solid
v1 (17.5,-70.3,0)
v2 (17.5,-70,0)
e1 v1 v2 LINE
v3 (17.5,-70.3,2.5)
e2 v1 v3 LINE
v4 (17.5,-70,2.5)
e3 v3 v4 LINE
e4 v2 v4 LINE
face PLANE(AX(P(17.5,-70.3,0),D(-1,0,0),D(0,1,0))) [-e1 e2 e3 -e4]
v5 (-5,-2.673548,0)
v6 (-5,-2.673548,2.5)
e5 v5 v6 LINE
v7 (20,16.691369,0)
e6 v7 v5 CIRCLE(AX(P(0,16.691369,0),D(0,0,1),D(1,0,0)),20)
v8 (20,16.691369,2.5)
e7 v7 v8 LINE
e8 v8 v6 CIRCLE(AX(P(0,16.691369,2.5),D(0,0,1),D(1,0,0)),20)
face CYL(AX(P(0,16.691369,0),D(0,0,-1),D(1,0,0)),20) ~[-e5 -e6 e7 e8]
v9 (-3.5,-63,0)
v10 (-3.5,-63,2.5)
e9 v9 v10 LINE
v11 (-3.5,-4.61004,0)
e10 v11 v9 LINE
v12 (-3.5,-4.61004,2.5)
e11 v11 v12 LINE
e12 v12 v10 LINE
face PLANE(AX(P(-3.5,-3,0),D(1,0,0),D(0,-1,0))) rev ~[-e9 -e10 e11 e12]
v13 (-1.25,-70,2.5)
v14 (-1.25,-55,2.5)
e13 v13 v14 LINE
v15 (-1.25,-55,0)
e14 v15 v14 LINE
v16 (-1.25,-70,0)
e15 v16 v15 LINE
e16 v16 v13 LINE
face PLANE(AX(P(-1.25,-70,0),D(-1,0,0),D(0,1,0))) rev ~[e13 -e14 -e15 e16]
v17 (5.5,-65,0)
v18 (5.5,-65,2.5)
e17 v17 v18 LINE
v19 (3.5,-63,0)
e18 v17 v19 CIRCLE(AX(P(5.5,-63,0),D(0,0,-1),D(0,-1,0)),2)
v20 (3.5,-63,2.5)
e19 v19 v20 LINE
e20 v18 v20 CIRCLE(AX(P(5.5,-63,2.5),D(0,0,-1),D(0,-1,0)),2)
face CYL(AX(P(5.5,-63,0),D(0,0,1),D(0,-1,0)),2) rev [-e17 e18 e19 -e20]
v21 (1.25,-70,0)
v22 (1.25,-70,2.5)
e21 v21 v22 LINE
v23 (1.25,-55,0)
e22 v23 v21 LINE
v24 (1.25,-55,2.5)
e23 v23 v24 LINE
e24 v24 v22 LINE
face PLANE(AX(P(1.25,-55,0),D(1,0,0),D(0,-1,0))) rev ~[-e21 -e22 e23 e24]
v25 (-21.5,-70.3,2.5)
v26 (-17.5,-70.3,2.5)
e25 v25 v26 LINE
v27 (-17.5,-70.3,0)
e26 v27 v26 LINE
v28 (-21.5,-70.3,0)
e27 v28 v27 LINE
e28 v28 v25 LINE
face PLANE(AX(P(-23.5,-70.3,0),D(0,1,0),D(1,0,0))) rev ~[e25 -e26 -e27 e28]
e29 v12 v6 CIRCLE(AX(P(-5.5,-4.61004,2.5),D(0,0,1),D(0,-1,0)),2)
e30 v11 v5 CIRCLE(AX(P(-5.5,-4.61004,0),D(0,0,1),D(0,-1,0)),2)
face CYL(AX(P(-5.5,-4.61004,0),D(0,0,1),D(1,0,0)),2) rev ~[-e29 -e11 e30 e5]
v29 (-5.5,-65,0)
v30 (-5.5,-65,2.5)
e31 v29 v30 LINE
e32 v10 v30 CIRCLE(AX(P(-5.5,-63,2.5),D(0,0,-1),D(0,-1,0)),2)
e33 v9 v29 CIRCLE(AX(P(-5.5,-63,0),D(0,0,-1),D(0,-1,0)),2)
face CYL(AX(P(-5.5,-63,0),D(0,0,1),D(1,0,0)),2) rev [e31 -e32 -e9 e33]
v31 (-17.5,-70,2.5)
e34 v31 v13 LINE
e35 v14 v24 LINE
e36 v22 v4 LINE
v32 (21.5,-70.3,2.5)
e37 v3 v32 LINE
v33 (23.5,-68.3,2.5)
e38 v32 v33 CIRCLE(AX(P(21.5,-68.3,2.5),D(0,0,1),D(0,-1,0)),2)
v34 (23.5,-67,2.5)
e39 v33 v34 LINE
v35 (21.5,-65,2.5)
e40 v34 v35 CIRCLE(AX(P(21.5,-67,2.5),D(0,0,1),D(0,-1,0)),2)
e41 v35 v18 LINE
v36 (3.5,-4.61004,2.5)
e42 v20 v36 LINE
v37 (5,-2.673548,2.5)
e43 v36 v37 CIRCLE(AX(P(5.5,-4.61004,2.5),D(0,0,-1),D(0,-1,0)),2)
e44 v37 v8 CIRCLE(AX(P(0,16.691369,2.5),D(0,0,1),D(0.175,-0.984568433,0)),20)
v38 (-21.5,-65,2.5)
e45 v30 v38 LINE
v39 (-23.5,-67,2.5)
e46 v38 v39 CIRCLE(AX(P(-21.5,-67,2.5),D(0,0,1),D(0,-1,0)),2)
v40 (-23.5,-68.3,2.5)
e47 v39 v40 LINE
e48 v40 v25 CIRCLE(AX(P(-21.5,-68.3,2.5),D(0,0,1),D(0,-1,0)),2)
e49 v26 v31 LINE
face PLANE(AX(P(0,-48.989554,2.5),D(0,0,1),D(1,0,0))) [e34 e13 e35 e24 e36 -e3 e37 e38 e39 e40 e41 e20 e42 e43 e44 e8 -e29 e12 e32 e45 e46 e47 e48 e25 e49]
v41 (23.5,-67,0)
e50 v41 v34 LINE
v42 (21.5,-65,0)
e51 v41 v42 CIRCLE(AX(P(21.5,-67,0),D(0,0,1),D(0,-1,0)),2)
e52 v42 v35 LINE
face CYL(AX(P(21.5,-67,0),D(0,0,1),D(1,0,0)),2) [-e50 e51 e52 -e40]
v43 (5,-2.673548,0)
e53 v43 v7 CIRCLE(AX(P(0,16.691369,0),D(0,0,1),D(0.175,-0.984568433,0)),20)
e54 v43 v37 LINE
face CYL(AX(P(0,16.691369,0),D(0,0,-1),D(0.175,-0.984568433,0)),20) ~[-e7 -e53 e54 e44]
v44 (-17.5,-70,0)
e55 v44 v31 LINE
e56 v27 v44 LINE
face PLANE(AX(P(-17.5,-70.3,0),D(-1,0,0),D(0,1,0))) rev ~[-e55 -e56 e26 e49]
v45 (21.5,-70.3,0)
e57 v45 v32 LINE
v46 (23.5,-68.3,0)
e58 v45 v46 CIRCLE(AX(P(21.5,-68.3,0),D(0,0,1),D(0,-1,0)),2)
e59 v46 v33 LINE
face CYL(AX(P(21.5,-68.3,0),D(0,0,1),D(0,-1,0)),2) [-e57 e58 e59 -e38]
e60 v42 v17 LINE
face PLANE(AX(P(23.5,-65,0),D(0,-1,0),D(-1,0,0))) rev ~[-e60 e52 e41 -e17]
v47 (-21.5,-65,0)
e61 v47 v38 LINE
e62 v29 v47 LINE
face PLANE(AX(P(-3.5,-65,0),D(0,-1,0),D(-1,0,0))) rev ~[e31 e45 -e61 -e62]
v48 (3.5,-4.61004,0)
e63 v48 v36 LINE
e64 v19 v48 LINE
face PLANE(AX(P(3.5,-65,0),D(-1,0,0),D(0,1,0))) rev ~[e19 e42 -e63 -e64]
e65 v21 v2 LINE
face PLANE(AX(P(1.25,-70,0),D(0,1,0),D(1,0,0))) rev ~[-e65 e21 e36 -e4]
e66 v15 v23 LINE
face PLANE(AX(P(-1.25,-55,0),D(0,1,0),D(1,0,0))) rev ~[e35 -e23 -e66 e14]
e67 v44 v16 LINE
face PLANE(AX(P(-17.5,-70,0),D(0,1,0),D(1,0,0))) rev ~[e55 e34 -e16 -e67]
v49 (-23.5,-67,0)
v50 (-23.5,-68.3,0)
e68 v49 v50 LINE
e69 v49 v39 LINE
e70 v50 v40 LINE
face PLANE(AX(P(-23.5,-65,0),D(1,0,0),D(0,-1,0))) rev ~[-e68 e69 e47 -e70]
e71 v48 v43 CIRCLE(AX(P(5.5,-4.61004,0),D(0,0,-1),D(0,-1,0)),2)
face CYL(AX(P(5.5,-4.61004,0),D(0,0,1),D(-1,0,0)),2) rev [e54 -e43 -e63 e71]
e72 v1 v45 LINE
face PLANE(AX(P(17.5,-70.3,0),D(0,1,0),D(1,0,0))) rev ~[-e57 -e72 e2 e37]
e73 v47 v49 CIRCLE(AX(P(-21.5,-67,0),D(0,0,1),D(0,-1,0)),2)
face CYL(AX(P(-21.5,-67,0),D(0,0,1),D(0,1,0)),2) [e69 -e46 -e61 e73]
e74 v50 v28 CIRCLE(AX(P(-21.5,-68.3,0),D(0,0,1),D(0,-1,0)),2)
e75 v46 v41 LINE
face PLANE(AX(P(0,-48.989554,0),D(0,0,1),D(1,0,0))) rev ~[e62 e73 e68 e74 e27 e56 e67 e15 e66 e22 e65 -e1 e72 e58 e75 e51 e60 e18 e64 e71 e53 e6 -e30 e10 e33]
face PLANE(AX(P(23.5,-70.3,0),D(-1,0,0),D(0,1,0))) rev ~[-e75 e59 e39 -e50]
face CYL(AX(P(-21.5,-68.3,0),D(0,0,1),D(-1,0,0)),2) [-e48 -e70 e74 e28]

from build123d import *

# Parameters (mm, degrees)
F0_W     = 6
F0_H     = 0.3
F1_DEPTH = 2.5
F2_R     = 2


# Not quite as in the source:
# - a feature names something its author has since deleted; it is built from what else it names


with BuildPart() as f1:
    # F0 (on Top) → F1 (new body)
    with BuildSketch(Plane.XY):
        with BuildLine():
            ThreePointArc((3.5, -3), (0, -3.3086313325), (-3.5, -3))
            Line((-3.5, -3), (-3.5, -65))
            Line((-3.5, -65), (-23.5, -65))
            Line((-23.5, -65), (-23.5, -70))
            Line((-23.5, -70), (-17.5, -70))
            Line((-17.5, -70), (-1.25, -70))
            Line((-1.25, -70), (-1.25, -55))
            Line((-1.25, -55), (1.25, -55))
            Line((1.25, -55), (1.25, -70))
            Line((1.25, -70), (17.5, -70))
            Line((17.5, -70), (23.5, -70))
            Line((23.5, -70), (23.5, -65))
            Line((23.5, -65), (3.5, -65))
            Line((3.5, -65), (3.5, -3))
        make_face()
        with BuildLine():
            ThreePointArc((20, 16.6913686675), (-12.8452325787, 32.0210783843), (-3.5, -3))
            ThreePointArc((-3.5, -3), (0, -3.3086313325), (3.5, -3))
            ThreePointArc((3.5, -3), (15.3297097168, 3.8461360889), (20, 16.6913686675))
        make_face()
        with Locations((-20.5, -70.15)):
            Rectangle(F0_W, F0_H)
        with Locations((20.5, -70.15)):
            Rectangle(F0_W, F0_H)
    extrude(amount=F1_DEPTH)

    # F2
    f2_edges = [f1.edges().sort_by_distance(p)[0] for p in [
        (-3.5, -3, 1.25),
        (3.5, -3, 1.25),
        (23.5, -65, 1.25),
        (-23.5, -65, 1.25),
        (-3.5, -65, 1.25),
        (3.5, -65, 1.25),
        (-23.5, -70.3, 1.25),
        (23.5, -70.3, 1.25),
    ]]
    fillet(f2_edges, radius=F2_R)


solid = f1.part
